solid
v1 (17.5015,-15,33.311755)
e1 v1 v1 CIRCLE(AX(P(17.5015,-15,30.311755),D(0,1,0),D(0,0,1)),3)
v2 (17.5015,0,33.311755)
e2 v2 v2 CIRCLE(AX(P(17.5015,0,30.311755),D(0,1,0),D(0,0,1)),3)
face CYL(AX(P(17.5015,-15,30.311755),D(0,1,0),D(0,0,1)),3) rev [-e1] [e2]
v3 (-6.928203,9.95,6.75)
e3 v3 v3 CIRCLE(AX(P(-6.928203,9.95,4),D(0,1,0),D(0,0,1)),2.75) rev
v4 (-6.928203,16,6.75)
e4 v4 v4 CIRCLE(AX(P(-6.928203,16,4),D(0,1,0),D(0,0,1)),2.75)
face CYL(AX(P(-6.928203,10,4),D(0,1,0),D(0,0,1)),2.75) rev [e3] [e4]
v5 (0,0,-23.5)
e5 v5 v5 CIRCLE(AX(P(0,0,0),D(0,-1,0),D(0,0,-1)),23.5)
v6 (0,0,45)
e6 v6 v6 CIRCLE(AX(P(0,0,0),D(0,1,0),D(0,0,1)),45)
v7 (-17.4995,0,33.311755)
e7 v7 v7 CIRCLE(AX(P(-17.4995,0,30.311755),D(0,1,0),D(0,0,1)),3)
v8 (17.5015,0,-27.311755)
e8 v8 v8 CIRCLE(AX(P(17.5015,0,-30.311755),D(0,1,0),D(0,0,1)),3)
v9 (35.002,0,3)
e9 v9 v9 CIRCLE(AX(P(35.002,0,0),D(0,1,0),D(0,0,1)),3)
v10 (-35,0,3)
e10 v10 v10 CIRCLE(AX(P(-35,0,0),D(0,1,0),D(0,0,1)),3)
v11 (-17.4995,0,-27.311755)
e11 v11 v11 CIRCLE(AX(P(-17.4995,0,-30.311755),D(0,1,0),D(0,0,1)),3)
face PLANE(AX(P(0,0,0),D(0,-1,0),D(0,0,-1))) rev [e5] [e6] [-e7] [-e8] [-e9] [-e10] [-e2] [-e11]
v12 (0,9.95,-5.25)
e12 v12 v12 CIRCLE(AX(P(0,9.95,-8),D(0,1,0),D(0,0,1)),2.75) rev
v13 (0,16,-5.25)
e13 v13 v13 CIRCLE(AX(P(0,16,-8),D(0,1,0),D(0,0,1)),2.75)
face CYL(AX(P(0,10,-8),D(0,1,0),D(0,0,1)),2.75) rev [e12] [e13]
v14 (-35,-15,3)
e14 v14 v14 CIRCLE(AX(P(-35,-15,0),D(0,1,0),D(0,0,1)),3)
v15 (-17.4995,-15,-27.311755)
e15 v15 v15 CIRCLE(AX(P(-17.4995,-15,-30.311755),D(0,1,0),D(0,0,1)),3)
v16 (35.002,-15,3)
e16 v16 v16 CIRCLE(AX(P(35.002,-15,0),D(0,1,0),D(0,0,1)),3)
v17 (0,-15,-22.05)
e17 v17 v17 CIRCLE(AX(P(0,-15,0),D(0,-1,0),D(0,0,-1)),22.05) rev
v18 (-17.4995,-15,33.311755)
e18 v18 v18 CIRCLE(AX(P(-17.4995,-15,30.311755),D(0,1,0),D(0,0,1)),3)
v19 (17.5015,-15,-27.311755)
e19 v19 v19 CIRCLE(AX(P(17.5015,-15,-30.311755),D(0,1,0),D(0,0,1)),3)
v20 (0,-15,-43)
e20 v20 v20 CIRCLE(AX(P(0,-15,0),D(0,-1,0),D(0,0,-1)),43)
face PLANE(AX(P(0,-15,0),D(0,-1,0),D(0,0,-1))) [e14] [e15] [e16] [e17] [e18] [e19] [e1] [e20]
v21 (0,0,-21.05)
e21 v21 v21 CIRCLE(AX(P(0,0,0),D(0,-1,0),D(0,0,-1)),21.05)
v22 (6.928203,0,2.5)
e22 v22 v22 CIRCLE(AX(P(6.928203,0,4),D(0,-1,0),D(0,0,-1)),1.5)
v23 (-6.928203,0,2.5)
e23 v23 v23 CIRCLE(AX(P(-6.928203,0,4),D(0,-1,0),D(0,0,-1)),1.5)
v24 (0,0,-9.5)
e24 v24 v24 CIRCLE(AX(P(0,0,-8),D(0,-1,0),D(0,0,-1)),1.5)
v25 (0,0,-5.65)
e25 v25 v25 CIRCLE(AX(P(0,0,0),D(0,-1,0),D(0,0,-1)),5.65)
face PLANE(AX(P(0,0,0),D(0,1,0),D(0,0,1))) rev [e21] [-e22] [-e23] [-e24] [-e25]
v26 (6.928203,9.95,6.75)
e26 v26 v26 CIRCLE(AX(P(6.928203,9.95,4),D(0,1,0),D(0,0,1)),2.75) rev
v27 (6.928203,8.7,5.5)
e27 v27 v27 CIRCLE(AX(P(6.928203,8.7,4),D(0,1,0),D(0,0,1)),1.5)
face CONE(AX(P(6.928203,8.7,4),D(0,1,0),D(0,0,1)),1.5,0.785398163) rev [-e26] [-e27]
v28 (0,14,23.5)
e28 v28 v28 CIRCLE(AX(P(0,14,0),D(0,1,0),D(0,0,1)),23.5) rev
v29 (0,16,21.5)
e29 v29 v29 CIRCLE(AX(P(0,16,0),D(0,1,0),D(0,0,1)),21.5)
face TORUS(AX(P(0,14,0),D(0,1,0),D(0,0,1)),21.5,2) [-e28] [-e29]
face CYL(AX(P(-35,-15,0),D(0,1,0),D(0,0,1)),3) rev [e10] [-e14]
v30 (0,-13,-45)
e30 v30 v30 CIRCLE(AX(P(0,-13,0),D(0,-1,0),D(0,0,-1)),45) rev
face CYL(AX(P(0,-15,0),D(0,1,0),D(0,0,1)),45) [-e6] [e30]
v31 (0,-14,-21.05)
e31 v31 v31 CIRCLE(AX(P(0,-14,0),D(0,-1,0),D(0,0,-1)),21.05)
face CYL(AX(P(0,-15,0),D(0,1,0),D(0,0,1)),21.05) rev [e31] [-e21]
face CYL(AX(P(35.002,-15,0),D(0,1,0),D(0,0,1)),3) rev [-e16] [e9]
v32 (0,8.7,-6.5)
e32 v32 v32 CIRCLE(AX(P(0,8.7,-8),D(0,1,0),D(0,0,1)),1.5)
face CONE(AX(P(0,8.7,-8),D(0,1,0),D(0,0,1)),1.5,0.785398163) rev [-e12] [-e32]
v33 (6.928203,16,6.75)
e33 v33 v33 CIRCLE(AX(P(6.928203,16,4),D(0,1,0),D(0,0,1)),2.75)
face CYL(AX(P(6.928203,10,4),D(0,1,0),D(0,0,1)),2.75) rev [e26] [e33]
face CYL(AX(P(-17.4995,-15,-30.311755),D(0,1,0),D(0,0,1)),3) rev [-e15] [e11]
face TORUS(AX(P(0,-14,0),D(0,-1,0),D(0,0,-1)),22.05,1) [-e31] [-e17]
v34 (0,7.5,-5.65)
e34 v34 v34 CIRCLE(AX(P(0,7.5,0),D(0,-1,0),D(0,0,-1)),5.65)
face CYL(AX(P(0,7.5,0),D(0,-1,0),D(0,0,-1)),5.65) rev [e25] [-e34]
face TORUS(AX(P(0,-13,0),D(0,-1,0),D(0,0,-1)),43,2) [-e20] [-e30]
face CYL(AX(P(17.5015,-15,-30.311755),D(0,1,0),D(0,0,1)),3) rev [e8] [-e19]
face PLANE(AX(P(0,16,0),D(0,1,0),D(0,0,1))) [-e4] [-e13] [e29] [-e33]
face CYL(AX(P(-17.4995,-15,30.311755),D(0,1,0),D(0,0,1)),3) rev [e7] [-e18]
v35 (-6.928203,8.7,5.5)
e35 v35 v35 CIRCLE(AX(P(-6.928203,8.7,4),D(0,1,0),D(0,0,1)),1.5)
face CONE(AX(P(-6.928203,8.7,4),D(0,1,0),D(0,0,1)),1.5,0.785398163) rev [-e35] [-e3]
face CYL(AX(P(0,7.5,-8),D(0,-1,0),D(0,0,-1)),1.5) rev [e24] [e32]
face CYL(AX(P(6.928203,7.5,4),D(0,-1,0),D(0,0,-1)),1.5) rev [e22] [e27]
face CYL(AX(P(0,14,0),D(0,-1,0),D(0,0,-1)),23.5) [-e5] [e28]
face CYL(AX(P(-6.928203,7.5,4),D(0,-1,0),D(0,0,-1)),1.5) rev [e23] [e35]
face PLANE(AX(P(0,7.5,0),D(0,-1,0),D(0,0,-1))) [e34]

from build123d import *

# Parameters (mm, degrees)
SKETCH1_R           = 23.5
BOSS_EXTRUDE1_DEPTH = 14
SKETCH2_R           = 25
SKETCH2_R_2         = 21.05
BOSS_EXTRUDE2_DEPTH = 15
SKETCH3_R           = 5.65
SKETCH3_R_2         = 1.5
CUT_EXTRUDE1_DEPTH  = 7.5
SKETCH4_R           = 23.5
SKETCH4_R_2         = 1.517776155
SKETCH4_R_3         = 1.5
BOSS_EXTRUDE3_DEPTH = 2
SKETCH5_R           = 2.75
CUT_EXTRUDE2_DEPTH  = 6
SKETCH6_R           = 1.5
CUT_EXTRUDE3_DEPTH  = 42.907636536
CHAMFER1_SIZE       = 1.3
BOSS_EXTRUDE5_START = -15
SKETCH7_R           = 45
SKETCH7_R_2         = 3
SKETCH7_R_3         = 23.5
BOSS_EXTRUDE5_DEPTH = 15
FILLET1_R           = 2
FILLET2_R           = 1


# Some blends are built 0.0001 mm under size
with BuildPart() as part:
    # Sketch1 → Boss-Extrude1 (new body)
    with BuildSketch(Plane(origin=(0, 0, 0), x_dir=(1, 0, 0), z_dir=(0, 1, 0))):
        with Locations(Location((0, 0, 0), (0, 0, 270))):
            Circle(SKETCH1_R)
    extrude(amount=BOSS_EXTRUDE1_DEPTH)

    # Sketch2 → Boss-Extrude2 (add)
    with BuildSketch(Plane.XZ):
        with Locations(Location((0, 0, 0), (0, 0, 270))):
            Circle(SKETCH2_R)
        with Locations(Location((0, 0, 0), (0, 0, 270))):
            Circle(SKETCH2_R_2, mode=Mode.SUBTRACT)
    extrude(amount=BOSS_EXTRUDE2_DEPTH)

    # Sketch3 → Cut-Extrude1 (cut)
    with BuildSketch(Plane(origin=(0, 0, 0), x_dir=(-1, 0, 0), z_dir=(0, -1, 0))):
        with Locations(Location((0, 0, 0), (0, 0, 90))):
            Circle(SKETCH3_R)
        with Locations(Location((0, 8, 0), (0, 0, 90))):
            Circle(SKETCH3_R_2)
        with Locations(Location((6.92820323, -4, 0), (0, 0, 90))):
            Circle(SKETCH3_R_2)
        with Locations(Location((-6.92820323, -4, 0), (0, 0, 90))):
            Circle(SKETCH3_R_2)
    extrude(amount=-CUT_EXTRUDE1_DEPTH, mode=Mode.SUBTRACT)

    # Sketch4 → Boss-Extrude3 (add)
    with BuildSketch(Plane(origin=(0, 14, 0), x_dir=(1, 0, 0), z_dir=(0, 1, 0))):
        with Locations(Location((0, 0, 0), (0, 0, 90))):
            Circle(SKETCH4_R)
        with Locations(Location((0, 8, 0), (0, 0, 270))):
            Circle(SKETCH4_R_2, mode=Mode.SUBTRACT)
        with Locations(Location((6.92820323, -4, 0), (0, 0, 90))):
            Circle(SKETCH4_R_3, mode=Mode.SUBTRACT)
        with Locations(Location((-6.92820323, -4, 0), (0, 0, 90))):
            Circle(SKETCH4_R_3, mode=Mode.SUBTRACT)
    extrude(amount=BOSS_EXTRUDE3_DEPTH)

    # Sketch5 → Cut-Extrude2 (cut)
    with BuildSketch(Plane(origin=(0, 16, 0), x_dir=(1, 0, 0), z_dir=(0, 1, 0))):
        with Locations(Location((0, 8, 0), (0, 0, 270))):
            Circle(SKETCH5_R)
        with Locations(Location((6.92820323, -4, 0), (0, 0, 270))):
            Circle(SKETCH5_R)
        with Locations(Location((-6.92820323, -4, 0), (0, 0, 270))):
            Circle(SKETCH5_R)
    extrude(amount=-CUT_EXTRUDE2_DEPTH, mode=Mode.SUBTRACT)

    # Sketch6 → Cut-Extrude3 (cut, through all)
    with BuildSketch(Plane.XZ.offset(-7.5)):
        with Locations(Location((-6.92820323, 4, 0), (0, 0, 270))):
            Circle(SKETCH6_R)
        with Locations(Location((0, -8, 0), (0, 0, 270))):
            Circle(SKETCH6_R)
        with Locations(Location((6.92820323, 4, 0), (0, 0, 270))):
            Circle(SKETCH6_R)
    extrude(amount=-CUT_EXTRUDE3_DEPTH, mode=Mode.SUBTRACT)

    # Chamfer1
    # the kernel refuses this chamfer: 1.3 mm, written as the material it takes off along each edge
    with BuildSketch(Plane(origin=(0, 10, -8), x_dir=(0, 0, -1), z_dir=(-1, 0, 0))) as chamfer1_piece_1_section:
        Polygon((1.5 + CHAMFER1_SIZE, 0), (1.5, CHAMFER1_SIZE), (1.5, 0), align=None)
    chamfer1_piece_1 = revolve(axis=Axis((0, 10, -8), (0, -1, 0)), mode=Mode.PRIVATE)
    chamfer1_piece_1 = chamfer1_piece_1 & Plane(origin=(0, 9.322421141, -8), x_dir=(0, 0, 1), z_dir=(0, 1, 0)) * Cylinder(2.75, 12, mode=Mode.PRIVATE)
    add(chamfer1_piece_1, mode=Mode.SUBTRACT)
    with BuildSketch(Plane(origin=(-6.92820323, 10, 4), x_dir=(0, 0, -1), z_dir=(-1, 0, 0))) as chamfer1_piece_2_section:
        Polygon((1.5 + CHAMFER1_SIZE, 0), (1.5, CHAMFER1_SIZE), (1.5, 0), align=None)
    chamfer1_piece_2 = revolve(axis=Axis((-6.92820323, 10, 4), (0, -1, 0)), mode=Mode.PRIVATE)
    chamfer1_piece_2 = chamfer1_piece_2 & Plane(origin=(-6.92820323, 9.322421141, 4), x_dir=(0, 0, 1), z_dir=(0, 1, 0)) * Cylinder(2.75, 12, mode=Mode.PRIVATE)
    add(chamfer1_piece_2, mode=Mode.SUBTRACT)
    with BuildSketch(Plane(origin=(6.92820323, 10, 4), x_dir=(0, 0, -1), z_dir=(-1, 0, 0))) as chamfer1_piece_3_section:
        Polygon((1.5 + CHAMFER1_SIZE, 0), (1.5, CHAMFER1_SIZE), (1.5, 0), align=None)
    chamfer1_piece_3 = revolve(axis=Axis((6.92820323, 10, 4), (0, -1, 0)), mode=Mode.PRIVATE)
    chamfer1_piece_3 = chamfer1_piece_3 & Plane(origin=(6.92820323, 9.322421141, 4), x_dir=(0, 0, 1), z_dir=(0, 1, 0)) * Cylinder(2.75, 12, mode=Mode.PRIVATE)
    add(chamfer1_piece_3, mode=Mode.SUBTRACT)

    # Sketch7 → Boss-Extrude5 (add)
    with BuildSketch(Plane(origin=(0, 0, 0), x_dir=(1, 0, 0), z_dir=(0, 1, 0)).offset(BOSS_EXTRUDE5_START)):
        with Locations(Location((0, 0, 0), (0, 0, 270))):
            Circle(SKETCH7_R)
        with Locations(Location((-35, 0, 0), (0, 0, 270))):
            Circle(SKETCH7_R_2, mode=Mode.SUBTRACT)
        with Locations(Location((-17.4995, 30.311755158, 0), (0, 0, 270))):
            Circle(SKETCH7_R_2, mode=Mode.SUBTRACT)
        with Locations(Location((17.5015, 30.311755158, 0), (0, 0, 270))):
            Circle(SKETCH7_R_2, mode=Mode.SUBTRACT)
        with Locations(Location((35.002, 0, 0), (0, 0, 270))):
            Circle(SKETCH7_R_2, mode=Mode.SUBTRACT)
        with Locations(Location((17.5015, -30.311755158, 0), (0, 0, 270))):
            Circle(SKETCH7_R_2, mode=Mode.SUBTRACT)
        with Locations(Location((-17.4995, -30.311755158, 0), (0, 0, 270))):
            Circle(SKETCH7_R_2, mode=Mode.SUBTRACT)
        with Locations(Location((0, 0, 0), (0, 0, 90))):
            Circle(SKETCH7_R_3, mode=Mode.SUBTRACT)
    extrude(amount=BOSS_EXTRUDE5_DEPTH)

    # Fillet1
    fillet1_edges = [part.edges().sort_by_distance(p)[0] for p in [
        (0, 16, 23.5),
        (0, -15, -45),
    ]]
    fillet(fillet1_edges, radius=FILLET1_R - 0.0001)  # a hair under: the kernel refuses the full size

    # Fillet2
    fillet2_edges = [part.edges().sort_by_distance(p)[0] for p in [
        (0, -15, 21.05),
    ]]
    fillet(fillet2_edges, radius=FILLET2_R)


solid = part.part
